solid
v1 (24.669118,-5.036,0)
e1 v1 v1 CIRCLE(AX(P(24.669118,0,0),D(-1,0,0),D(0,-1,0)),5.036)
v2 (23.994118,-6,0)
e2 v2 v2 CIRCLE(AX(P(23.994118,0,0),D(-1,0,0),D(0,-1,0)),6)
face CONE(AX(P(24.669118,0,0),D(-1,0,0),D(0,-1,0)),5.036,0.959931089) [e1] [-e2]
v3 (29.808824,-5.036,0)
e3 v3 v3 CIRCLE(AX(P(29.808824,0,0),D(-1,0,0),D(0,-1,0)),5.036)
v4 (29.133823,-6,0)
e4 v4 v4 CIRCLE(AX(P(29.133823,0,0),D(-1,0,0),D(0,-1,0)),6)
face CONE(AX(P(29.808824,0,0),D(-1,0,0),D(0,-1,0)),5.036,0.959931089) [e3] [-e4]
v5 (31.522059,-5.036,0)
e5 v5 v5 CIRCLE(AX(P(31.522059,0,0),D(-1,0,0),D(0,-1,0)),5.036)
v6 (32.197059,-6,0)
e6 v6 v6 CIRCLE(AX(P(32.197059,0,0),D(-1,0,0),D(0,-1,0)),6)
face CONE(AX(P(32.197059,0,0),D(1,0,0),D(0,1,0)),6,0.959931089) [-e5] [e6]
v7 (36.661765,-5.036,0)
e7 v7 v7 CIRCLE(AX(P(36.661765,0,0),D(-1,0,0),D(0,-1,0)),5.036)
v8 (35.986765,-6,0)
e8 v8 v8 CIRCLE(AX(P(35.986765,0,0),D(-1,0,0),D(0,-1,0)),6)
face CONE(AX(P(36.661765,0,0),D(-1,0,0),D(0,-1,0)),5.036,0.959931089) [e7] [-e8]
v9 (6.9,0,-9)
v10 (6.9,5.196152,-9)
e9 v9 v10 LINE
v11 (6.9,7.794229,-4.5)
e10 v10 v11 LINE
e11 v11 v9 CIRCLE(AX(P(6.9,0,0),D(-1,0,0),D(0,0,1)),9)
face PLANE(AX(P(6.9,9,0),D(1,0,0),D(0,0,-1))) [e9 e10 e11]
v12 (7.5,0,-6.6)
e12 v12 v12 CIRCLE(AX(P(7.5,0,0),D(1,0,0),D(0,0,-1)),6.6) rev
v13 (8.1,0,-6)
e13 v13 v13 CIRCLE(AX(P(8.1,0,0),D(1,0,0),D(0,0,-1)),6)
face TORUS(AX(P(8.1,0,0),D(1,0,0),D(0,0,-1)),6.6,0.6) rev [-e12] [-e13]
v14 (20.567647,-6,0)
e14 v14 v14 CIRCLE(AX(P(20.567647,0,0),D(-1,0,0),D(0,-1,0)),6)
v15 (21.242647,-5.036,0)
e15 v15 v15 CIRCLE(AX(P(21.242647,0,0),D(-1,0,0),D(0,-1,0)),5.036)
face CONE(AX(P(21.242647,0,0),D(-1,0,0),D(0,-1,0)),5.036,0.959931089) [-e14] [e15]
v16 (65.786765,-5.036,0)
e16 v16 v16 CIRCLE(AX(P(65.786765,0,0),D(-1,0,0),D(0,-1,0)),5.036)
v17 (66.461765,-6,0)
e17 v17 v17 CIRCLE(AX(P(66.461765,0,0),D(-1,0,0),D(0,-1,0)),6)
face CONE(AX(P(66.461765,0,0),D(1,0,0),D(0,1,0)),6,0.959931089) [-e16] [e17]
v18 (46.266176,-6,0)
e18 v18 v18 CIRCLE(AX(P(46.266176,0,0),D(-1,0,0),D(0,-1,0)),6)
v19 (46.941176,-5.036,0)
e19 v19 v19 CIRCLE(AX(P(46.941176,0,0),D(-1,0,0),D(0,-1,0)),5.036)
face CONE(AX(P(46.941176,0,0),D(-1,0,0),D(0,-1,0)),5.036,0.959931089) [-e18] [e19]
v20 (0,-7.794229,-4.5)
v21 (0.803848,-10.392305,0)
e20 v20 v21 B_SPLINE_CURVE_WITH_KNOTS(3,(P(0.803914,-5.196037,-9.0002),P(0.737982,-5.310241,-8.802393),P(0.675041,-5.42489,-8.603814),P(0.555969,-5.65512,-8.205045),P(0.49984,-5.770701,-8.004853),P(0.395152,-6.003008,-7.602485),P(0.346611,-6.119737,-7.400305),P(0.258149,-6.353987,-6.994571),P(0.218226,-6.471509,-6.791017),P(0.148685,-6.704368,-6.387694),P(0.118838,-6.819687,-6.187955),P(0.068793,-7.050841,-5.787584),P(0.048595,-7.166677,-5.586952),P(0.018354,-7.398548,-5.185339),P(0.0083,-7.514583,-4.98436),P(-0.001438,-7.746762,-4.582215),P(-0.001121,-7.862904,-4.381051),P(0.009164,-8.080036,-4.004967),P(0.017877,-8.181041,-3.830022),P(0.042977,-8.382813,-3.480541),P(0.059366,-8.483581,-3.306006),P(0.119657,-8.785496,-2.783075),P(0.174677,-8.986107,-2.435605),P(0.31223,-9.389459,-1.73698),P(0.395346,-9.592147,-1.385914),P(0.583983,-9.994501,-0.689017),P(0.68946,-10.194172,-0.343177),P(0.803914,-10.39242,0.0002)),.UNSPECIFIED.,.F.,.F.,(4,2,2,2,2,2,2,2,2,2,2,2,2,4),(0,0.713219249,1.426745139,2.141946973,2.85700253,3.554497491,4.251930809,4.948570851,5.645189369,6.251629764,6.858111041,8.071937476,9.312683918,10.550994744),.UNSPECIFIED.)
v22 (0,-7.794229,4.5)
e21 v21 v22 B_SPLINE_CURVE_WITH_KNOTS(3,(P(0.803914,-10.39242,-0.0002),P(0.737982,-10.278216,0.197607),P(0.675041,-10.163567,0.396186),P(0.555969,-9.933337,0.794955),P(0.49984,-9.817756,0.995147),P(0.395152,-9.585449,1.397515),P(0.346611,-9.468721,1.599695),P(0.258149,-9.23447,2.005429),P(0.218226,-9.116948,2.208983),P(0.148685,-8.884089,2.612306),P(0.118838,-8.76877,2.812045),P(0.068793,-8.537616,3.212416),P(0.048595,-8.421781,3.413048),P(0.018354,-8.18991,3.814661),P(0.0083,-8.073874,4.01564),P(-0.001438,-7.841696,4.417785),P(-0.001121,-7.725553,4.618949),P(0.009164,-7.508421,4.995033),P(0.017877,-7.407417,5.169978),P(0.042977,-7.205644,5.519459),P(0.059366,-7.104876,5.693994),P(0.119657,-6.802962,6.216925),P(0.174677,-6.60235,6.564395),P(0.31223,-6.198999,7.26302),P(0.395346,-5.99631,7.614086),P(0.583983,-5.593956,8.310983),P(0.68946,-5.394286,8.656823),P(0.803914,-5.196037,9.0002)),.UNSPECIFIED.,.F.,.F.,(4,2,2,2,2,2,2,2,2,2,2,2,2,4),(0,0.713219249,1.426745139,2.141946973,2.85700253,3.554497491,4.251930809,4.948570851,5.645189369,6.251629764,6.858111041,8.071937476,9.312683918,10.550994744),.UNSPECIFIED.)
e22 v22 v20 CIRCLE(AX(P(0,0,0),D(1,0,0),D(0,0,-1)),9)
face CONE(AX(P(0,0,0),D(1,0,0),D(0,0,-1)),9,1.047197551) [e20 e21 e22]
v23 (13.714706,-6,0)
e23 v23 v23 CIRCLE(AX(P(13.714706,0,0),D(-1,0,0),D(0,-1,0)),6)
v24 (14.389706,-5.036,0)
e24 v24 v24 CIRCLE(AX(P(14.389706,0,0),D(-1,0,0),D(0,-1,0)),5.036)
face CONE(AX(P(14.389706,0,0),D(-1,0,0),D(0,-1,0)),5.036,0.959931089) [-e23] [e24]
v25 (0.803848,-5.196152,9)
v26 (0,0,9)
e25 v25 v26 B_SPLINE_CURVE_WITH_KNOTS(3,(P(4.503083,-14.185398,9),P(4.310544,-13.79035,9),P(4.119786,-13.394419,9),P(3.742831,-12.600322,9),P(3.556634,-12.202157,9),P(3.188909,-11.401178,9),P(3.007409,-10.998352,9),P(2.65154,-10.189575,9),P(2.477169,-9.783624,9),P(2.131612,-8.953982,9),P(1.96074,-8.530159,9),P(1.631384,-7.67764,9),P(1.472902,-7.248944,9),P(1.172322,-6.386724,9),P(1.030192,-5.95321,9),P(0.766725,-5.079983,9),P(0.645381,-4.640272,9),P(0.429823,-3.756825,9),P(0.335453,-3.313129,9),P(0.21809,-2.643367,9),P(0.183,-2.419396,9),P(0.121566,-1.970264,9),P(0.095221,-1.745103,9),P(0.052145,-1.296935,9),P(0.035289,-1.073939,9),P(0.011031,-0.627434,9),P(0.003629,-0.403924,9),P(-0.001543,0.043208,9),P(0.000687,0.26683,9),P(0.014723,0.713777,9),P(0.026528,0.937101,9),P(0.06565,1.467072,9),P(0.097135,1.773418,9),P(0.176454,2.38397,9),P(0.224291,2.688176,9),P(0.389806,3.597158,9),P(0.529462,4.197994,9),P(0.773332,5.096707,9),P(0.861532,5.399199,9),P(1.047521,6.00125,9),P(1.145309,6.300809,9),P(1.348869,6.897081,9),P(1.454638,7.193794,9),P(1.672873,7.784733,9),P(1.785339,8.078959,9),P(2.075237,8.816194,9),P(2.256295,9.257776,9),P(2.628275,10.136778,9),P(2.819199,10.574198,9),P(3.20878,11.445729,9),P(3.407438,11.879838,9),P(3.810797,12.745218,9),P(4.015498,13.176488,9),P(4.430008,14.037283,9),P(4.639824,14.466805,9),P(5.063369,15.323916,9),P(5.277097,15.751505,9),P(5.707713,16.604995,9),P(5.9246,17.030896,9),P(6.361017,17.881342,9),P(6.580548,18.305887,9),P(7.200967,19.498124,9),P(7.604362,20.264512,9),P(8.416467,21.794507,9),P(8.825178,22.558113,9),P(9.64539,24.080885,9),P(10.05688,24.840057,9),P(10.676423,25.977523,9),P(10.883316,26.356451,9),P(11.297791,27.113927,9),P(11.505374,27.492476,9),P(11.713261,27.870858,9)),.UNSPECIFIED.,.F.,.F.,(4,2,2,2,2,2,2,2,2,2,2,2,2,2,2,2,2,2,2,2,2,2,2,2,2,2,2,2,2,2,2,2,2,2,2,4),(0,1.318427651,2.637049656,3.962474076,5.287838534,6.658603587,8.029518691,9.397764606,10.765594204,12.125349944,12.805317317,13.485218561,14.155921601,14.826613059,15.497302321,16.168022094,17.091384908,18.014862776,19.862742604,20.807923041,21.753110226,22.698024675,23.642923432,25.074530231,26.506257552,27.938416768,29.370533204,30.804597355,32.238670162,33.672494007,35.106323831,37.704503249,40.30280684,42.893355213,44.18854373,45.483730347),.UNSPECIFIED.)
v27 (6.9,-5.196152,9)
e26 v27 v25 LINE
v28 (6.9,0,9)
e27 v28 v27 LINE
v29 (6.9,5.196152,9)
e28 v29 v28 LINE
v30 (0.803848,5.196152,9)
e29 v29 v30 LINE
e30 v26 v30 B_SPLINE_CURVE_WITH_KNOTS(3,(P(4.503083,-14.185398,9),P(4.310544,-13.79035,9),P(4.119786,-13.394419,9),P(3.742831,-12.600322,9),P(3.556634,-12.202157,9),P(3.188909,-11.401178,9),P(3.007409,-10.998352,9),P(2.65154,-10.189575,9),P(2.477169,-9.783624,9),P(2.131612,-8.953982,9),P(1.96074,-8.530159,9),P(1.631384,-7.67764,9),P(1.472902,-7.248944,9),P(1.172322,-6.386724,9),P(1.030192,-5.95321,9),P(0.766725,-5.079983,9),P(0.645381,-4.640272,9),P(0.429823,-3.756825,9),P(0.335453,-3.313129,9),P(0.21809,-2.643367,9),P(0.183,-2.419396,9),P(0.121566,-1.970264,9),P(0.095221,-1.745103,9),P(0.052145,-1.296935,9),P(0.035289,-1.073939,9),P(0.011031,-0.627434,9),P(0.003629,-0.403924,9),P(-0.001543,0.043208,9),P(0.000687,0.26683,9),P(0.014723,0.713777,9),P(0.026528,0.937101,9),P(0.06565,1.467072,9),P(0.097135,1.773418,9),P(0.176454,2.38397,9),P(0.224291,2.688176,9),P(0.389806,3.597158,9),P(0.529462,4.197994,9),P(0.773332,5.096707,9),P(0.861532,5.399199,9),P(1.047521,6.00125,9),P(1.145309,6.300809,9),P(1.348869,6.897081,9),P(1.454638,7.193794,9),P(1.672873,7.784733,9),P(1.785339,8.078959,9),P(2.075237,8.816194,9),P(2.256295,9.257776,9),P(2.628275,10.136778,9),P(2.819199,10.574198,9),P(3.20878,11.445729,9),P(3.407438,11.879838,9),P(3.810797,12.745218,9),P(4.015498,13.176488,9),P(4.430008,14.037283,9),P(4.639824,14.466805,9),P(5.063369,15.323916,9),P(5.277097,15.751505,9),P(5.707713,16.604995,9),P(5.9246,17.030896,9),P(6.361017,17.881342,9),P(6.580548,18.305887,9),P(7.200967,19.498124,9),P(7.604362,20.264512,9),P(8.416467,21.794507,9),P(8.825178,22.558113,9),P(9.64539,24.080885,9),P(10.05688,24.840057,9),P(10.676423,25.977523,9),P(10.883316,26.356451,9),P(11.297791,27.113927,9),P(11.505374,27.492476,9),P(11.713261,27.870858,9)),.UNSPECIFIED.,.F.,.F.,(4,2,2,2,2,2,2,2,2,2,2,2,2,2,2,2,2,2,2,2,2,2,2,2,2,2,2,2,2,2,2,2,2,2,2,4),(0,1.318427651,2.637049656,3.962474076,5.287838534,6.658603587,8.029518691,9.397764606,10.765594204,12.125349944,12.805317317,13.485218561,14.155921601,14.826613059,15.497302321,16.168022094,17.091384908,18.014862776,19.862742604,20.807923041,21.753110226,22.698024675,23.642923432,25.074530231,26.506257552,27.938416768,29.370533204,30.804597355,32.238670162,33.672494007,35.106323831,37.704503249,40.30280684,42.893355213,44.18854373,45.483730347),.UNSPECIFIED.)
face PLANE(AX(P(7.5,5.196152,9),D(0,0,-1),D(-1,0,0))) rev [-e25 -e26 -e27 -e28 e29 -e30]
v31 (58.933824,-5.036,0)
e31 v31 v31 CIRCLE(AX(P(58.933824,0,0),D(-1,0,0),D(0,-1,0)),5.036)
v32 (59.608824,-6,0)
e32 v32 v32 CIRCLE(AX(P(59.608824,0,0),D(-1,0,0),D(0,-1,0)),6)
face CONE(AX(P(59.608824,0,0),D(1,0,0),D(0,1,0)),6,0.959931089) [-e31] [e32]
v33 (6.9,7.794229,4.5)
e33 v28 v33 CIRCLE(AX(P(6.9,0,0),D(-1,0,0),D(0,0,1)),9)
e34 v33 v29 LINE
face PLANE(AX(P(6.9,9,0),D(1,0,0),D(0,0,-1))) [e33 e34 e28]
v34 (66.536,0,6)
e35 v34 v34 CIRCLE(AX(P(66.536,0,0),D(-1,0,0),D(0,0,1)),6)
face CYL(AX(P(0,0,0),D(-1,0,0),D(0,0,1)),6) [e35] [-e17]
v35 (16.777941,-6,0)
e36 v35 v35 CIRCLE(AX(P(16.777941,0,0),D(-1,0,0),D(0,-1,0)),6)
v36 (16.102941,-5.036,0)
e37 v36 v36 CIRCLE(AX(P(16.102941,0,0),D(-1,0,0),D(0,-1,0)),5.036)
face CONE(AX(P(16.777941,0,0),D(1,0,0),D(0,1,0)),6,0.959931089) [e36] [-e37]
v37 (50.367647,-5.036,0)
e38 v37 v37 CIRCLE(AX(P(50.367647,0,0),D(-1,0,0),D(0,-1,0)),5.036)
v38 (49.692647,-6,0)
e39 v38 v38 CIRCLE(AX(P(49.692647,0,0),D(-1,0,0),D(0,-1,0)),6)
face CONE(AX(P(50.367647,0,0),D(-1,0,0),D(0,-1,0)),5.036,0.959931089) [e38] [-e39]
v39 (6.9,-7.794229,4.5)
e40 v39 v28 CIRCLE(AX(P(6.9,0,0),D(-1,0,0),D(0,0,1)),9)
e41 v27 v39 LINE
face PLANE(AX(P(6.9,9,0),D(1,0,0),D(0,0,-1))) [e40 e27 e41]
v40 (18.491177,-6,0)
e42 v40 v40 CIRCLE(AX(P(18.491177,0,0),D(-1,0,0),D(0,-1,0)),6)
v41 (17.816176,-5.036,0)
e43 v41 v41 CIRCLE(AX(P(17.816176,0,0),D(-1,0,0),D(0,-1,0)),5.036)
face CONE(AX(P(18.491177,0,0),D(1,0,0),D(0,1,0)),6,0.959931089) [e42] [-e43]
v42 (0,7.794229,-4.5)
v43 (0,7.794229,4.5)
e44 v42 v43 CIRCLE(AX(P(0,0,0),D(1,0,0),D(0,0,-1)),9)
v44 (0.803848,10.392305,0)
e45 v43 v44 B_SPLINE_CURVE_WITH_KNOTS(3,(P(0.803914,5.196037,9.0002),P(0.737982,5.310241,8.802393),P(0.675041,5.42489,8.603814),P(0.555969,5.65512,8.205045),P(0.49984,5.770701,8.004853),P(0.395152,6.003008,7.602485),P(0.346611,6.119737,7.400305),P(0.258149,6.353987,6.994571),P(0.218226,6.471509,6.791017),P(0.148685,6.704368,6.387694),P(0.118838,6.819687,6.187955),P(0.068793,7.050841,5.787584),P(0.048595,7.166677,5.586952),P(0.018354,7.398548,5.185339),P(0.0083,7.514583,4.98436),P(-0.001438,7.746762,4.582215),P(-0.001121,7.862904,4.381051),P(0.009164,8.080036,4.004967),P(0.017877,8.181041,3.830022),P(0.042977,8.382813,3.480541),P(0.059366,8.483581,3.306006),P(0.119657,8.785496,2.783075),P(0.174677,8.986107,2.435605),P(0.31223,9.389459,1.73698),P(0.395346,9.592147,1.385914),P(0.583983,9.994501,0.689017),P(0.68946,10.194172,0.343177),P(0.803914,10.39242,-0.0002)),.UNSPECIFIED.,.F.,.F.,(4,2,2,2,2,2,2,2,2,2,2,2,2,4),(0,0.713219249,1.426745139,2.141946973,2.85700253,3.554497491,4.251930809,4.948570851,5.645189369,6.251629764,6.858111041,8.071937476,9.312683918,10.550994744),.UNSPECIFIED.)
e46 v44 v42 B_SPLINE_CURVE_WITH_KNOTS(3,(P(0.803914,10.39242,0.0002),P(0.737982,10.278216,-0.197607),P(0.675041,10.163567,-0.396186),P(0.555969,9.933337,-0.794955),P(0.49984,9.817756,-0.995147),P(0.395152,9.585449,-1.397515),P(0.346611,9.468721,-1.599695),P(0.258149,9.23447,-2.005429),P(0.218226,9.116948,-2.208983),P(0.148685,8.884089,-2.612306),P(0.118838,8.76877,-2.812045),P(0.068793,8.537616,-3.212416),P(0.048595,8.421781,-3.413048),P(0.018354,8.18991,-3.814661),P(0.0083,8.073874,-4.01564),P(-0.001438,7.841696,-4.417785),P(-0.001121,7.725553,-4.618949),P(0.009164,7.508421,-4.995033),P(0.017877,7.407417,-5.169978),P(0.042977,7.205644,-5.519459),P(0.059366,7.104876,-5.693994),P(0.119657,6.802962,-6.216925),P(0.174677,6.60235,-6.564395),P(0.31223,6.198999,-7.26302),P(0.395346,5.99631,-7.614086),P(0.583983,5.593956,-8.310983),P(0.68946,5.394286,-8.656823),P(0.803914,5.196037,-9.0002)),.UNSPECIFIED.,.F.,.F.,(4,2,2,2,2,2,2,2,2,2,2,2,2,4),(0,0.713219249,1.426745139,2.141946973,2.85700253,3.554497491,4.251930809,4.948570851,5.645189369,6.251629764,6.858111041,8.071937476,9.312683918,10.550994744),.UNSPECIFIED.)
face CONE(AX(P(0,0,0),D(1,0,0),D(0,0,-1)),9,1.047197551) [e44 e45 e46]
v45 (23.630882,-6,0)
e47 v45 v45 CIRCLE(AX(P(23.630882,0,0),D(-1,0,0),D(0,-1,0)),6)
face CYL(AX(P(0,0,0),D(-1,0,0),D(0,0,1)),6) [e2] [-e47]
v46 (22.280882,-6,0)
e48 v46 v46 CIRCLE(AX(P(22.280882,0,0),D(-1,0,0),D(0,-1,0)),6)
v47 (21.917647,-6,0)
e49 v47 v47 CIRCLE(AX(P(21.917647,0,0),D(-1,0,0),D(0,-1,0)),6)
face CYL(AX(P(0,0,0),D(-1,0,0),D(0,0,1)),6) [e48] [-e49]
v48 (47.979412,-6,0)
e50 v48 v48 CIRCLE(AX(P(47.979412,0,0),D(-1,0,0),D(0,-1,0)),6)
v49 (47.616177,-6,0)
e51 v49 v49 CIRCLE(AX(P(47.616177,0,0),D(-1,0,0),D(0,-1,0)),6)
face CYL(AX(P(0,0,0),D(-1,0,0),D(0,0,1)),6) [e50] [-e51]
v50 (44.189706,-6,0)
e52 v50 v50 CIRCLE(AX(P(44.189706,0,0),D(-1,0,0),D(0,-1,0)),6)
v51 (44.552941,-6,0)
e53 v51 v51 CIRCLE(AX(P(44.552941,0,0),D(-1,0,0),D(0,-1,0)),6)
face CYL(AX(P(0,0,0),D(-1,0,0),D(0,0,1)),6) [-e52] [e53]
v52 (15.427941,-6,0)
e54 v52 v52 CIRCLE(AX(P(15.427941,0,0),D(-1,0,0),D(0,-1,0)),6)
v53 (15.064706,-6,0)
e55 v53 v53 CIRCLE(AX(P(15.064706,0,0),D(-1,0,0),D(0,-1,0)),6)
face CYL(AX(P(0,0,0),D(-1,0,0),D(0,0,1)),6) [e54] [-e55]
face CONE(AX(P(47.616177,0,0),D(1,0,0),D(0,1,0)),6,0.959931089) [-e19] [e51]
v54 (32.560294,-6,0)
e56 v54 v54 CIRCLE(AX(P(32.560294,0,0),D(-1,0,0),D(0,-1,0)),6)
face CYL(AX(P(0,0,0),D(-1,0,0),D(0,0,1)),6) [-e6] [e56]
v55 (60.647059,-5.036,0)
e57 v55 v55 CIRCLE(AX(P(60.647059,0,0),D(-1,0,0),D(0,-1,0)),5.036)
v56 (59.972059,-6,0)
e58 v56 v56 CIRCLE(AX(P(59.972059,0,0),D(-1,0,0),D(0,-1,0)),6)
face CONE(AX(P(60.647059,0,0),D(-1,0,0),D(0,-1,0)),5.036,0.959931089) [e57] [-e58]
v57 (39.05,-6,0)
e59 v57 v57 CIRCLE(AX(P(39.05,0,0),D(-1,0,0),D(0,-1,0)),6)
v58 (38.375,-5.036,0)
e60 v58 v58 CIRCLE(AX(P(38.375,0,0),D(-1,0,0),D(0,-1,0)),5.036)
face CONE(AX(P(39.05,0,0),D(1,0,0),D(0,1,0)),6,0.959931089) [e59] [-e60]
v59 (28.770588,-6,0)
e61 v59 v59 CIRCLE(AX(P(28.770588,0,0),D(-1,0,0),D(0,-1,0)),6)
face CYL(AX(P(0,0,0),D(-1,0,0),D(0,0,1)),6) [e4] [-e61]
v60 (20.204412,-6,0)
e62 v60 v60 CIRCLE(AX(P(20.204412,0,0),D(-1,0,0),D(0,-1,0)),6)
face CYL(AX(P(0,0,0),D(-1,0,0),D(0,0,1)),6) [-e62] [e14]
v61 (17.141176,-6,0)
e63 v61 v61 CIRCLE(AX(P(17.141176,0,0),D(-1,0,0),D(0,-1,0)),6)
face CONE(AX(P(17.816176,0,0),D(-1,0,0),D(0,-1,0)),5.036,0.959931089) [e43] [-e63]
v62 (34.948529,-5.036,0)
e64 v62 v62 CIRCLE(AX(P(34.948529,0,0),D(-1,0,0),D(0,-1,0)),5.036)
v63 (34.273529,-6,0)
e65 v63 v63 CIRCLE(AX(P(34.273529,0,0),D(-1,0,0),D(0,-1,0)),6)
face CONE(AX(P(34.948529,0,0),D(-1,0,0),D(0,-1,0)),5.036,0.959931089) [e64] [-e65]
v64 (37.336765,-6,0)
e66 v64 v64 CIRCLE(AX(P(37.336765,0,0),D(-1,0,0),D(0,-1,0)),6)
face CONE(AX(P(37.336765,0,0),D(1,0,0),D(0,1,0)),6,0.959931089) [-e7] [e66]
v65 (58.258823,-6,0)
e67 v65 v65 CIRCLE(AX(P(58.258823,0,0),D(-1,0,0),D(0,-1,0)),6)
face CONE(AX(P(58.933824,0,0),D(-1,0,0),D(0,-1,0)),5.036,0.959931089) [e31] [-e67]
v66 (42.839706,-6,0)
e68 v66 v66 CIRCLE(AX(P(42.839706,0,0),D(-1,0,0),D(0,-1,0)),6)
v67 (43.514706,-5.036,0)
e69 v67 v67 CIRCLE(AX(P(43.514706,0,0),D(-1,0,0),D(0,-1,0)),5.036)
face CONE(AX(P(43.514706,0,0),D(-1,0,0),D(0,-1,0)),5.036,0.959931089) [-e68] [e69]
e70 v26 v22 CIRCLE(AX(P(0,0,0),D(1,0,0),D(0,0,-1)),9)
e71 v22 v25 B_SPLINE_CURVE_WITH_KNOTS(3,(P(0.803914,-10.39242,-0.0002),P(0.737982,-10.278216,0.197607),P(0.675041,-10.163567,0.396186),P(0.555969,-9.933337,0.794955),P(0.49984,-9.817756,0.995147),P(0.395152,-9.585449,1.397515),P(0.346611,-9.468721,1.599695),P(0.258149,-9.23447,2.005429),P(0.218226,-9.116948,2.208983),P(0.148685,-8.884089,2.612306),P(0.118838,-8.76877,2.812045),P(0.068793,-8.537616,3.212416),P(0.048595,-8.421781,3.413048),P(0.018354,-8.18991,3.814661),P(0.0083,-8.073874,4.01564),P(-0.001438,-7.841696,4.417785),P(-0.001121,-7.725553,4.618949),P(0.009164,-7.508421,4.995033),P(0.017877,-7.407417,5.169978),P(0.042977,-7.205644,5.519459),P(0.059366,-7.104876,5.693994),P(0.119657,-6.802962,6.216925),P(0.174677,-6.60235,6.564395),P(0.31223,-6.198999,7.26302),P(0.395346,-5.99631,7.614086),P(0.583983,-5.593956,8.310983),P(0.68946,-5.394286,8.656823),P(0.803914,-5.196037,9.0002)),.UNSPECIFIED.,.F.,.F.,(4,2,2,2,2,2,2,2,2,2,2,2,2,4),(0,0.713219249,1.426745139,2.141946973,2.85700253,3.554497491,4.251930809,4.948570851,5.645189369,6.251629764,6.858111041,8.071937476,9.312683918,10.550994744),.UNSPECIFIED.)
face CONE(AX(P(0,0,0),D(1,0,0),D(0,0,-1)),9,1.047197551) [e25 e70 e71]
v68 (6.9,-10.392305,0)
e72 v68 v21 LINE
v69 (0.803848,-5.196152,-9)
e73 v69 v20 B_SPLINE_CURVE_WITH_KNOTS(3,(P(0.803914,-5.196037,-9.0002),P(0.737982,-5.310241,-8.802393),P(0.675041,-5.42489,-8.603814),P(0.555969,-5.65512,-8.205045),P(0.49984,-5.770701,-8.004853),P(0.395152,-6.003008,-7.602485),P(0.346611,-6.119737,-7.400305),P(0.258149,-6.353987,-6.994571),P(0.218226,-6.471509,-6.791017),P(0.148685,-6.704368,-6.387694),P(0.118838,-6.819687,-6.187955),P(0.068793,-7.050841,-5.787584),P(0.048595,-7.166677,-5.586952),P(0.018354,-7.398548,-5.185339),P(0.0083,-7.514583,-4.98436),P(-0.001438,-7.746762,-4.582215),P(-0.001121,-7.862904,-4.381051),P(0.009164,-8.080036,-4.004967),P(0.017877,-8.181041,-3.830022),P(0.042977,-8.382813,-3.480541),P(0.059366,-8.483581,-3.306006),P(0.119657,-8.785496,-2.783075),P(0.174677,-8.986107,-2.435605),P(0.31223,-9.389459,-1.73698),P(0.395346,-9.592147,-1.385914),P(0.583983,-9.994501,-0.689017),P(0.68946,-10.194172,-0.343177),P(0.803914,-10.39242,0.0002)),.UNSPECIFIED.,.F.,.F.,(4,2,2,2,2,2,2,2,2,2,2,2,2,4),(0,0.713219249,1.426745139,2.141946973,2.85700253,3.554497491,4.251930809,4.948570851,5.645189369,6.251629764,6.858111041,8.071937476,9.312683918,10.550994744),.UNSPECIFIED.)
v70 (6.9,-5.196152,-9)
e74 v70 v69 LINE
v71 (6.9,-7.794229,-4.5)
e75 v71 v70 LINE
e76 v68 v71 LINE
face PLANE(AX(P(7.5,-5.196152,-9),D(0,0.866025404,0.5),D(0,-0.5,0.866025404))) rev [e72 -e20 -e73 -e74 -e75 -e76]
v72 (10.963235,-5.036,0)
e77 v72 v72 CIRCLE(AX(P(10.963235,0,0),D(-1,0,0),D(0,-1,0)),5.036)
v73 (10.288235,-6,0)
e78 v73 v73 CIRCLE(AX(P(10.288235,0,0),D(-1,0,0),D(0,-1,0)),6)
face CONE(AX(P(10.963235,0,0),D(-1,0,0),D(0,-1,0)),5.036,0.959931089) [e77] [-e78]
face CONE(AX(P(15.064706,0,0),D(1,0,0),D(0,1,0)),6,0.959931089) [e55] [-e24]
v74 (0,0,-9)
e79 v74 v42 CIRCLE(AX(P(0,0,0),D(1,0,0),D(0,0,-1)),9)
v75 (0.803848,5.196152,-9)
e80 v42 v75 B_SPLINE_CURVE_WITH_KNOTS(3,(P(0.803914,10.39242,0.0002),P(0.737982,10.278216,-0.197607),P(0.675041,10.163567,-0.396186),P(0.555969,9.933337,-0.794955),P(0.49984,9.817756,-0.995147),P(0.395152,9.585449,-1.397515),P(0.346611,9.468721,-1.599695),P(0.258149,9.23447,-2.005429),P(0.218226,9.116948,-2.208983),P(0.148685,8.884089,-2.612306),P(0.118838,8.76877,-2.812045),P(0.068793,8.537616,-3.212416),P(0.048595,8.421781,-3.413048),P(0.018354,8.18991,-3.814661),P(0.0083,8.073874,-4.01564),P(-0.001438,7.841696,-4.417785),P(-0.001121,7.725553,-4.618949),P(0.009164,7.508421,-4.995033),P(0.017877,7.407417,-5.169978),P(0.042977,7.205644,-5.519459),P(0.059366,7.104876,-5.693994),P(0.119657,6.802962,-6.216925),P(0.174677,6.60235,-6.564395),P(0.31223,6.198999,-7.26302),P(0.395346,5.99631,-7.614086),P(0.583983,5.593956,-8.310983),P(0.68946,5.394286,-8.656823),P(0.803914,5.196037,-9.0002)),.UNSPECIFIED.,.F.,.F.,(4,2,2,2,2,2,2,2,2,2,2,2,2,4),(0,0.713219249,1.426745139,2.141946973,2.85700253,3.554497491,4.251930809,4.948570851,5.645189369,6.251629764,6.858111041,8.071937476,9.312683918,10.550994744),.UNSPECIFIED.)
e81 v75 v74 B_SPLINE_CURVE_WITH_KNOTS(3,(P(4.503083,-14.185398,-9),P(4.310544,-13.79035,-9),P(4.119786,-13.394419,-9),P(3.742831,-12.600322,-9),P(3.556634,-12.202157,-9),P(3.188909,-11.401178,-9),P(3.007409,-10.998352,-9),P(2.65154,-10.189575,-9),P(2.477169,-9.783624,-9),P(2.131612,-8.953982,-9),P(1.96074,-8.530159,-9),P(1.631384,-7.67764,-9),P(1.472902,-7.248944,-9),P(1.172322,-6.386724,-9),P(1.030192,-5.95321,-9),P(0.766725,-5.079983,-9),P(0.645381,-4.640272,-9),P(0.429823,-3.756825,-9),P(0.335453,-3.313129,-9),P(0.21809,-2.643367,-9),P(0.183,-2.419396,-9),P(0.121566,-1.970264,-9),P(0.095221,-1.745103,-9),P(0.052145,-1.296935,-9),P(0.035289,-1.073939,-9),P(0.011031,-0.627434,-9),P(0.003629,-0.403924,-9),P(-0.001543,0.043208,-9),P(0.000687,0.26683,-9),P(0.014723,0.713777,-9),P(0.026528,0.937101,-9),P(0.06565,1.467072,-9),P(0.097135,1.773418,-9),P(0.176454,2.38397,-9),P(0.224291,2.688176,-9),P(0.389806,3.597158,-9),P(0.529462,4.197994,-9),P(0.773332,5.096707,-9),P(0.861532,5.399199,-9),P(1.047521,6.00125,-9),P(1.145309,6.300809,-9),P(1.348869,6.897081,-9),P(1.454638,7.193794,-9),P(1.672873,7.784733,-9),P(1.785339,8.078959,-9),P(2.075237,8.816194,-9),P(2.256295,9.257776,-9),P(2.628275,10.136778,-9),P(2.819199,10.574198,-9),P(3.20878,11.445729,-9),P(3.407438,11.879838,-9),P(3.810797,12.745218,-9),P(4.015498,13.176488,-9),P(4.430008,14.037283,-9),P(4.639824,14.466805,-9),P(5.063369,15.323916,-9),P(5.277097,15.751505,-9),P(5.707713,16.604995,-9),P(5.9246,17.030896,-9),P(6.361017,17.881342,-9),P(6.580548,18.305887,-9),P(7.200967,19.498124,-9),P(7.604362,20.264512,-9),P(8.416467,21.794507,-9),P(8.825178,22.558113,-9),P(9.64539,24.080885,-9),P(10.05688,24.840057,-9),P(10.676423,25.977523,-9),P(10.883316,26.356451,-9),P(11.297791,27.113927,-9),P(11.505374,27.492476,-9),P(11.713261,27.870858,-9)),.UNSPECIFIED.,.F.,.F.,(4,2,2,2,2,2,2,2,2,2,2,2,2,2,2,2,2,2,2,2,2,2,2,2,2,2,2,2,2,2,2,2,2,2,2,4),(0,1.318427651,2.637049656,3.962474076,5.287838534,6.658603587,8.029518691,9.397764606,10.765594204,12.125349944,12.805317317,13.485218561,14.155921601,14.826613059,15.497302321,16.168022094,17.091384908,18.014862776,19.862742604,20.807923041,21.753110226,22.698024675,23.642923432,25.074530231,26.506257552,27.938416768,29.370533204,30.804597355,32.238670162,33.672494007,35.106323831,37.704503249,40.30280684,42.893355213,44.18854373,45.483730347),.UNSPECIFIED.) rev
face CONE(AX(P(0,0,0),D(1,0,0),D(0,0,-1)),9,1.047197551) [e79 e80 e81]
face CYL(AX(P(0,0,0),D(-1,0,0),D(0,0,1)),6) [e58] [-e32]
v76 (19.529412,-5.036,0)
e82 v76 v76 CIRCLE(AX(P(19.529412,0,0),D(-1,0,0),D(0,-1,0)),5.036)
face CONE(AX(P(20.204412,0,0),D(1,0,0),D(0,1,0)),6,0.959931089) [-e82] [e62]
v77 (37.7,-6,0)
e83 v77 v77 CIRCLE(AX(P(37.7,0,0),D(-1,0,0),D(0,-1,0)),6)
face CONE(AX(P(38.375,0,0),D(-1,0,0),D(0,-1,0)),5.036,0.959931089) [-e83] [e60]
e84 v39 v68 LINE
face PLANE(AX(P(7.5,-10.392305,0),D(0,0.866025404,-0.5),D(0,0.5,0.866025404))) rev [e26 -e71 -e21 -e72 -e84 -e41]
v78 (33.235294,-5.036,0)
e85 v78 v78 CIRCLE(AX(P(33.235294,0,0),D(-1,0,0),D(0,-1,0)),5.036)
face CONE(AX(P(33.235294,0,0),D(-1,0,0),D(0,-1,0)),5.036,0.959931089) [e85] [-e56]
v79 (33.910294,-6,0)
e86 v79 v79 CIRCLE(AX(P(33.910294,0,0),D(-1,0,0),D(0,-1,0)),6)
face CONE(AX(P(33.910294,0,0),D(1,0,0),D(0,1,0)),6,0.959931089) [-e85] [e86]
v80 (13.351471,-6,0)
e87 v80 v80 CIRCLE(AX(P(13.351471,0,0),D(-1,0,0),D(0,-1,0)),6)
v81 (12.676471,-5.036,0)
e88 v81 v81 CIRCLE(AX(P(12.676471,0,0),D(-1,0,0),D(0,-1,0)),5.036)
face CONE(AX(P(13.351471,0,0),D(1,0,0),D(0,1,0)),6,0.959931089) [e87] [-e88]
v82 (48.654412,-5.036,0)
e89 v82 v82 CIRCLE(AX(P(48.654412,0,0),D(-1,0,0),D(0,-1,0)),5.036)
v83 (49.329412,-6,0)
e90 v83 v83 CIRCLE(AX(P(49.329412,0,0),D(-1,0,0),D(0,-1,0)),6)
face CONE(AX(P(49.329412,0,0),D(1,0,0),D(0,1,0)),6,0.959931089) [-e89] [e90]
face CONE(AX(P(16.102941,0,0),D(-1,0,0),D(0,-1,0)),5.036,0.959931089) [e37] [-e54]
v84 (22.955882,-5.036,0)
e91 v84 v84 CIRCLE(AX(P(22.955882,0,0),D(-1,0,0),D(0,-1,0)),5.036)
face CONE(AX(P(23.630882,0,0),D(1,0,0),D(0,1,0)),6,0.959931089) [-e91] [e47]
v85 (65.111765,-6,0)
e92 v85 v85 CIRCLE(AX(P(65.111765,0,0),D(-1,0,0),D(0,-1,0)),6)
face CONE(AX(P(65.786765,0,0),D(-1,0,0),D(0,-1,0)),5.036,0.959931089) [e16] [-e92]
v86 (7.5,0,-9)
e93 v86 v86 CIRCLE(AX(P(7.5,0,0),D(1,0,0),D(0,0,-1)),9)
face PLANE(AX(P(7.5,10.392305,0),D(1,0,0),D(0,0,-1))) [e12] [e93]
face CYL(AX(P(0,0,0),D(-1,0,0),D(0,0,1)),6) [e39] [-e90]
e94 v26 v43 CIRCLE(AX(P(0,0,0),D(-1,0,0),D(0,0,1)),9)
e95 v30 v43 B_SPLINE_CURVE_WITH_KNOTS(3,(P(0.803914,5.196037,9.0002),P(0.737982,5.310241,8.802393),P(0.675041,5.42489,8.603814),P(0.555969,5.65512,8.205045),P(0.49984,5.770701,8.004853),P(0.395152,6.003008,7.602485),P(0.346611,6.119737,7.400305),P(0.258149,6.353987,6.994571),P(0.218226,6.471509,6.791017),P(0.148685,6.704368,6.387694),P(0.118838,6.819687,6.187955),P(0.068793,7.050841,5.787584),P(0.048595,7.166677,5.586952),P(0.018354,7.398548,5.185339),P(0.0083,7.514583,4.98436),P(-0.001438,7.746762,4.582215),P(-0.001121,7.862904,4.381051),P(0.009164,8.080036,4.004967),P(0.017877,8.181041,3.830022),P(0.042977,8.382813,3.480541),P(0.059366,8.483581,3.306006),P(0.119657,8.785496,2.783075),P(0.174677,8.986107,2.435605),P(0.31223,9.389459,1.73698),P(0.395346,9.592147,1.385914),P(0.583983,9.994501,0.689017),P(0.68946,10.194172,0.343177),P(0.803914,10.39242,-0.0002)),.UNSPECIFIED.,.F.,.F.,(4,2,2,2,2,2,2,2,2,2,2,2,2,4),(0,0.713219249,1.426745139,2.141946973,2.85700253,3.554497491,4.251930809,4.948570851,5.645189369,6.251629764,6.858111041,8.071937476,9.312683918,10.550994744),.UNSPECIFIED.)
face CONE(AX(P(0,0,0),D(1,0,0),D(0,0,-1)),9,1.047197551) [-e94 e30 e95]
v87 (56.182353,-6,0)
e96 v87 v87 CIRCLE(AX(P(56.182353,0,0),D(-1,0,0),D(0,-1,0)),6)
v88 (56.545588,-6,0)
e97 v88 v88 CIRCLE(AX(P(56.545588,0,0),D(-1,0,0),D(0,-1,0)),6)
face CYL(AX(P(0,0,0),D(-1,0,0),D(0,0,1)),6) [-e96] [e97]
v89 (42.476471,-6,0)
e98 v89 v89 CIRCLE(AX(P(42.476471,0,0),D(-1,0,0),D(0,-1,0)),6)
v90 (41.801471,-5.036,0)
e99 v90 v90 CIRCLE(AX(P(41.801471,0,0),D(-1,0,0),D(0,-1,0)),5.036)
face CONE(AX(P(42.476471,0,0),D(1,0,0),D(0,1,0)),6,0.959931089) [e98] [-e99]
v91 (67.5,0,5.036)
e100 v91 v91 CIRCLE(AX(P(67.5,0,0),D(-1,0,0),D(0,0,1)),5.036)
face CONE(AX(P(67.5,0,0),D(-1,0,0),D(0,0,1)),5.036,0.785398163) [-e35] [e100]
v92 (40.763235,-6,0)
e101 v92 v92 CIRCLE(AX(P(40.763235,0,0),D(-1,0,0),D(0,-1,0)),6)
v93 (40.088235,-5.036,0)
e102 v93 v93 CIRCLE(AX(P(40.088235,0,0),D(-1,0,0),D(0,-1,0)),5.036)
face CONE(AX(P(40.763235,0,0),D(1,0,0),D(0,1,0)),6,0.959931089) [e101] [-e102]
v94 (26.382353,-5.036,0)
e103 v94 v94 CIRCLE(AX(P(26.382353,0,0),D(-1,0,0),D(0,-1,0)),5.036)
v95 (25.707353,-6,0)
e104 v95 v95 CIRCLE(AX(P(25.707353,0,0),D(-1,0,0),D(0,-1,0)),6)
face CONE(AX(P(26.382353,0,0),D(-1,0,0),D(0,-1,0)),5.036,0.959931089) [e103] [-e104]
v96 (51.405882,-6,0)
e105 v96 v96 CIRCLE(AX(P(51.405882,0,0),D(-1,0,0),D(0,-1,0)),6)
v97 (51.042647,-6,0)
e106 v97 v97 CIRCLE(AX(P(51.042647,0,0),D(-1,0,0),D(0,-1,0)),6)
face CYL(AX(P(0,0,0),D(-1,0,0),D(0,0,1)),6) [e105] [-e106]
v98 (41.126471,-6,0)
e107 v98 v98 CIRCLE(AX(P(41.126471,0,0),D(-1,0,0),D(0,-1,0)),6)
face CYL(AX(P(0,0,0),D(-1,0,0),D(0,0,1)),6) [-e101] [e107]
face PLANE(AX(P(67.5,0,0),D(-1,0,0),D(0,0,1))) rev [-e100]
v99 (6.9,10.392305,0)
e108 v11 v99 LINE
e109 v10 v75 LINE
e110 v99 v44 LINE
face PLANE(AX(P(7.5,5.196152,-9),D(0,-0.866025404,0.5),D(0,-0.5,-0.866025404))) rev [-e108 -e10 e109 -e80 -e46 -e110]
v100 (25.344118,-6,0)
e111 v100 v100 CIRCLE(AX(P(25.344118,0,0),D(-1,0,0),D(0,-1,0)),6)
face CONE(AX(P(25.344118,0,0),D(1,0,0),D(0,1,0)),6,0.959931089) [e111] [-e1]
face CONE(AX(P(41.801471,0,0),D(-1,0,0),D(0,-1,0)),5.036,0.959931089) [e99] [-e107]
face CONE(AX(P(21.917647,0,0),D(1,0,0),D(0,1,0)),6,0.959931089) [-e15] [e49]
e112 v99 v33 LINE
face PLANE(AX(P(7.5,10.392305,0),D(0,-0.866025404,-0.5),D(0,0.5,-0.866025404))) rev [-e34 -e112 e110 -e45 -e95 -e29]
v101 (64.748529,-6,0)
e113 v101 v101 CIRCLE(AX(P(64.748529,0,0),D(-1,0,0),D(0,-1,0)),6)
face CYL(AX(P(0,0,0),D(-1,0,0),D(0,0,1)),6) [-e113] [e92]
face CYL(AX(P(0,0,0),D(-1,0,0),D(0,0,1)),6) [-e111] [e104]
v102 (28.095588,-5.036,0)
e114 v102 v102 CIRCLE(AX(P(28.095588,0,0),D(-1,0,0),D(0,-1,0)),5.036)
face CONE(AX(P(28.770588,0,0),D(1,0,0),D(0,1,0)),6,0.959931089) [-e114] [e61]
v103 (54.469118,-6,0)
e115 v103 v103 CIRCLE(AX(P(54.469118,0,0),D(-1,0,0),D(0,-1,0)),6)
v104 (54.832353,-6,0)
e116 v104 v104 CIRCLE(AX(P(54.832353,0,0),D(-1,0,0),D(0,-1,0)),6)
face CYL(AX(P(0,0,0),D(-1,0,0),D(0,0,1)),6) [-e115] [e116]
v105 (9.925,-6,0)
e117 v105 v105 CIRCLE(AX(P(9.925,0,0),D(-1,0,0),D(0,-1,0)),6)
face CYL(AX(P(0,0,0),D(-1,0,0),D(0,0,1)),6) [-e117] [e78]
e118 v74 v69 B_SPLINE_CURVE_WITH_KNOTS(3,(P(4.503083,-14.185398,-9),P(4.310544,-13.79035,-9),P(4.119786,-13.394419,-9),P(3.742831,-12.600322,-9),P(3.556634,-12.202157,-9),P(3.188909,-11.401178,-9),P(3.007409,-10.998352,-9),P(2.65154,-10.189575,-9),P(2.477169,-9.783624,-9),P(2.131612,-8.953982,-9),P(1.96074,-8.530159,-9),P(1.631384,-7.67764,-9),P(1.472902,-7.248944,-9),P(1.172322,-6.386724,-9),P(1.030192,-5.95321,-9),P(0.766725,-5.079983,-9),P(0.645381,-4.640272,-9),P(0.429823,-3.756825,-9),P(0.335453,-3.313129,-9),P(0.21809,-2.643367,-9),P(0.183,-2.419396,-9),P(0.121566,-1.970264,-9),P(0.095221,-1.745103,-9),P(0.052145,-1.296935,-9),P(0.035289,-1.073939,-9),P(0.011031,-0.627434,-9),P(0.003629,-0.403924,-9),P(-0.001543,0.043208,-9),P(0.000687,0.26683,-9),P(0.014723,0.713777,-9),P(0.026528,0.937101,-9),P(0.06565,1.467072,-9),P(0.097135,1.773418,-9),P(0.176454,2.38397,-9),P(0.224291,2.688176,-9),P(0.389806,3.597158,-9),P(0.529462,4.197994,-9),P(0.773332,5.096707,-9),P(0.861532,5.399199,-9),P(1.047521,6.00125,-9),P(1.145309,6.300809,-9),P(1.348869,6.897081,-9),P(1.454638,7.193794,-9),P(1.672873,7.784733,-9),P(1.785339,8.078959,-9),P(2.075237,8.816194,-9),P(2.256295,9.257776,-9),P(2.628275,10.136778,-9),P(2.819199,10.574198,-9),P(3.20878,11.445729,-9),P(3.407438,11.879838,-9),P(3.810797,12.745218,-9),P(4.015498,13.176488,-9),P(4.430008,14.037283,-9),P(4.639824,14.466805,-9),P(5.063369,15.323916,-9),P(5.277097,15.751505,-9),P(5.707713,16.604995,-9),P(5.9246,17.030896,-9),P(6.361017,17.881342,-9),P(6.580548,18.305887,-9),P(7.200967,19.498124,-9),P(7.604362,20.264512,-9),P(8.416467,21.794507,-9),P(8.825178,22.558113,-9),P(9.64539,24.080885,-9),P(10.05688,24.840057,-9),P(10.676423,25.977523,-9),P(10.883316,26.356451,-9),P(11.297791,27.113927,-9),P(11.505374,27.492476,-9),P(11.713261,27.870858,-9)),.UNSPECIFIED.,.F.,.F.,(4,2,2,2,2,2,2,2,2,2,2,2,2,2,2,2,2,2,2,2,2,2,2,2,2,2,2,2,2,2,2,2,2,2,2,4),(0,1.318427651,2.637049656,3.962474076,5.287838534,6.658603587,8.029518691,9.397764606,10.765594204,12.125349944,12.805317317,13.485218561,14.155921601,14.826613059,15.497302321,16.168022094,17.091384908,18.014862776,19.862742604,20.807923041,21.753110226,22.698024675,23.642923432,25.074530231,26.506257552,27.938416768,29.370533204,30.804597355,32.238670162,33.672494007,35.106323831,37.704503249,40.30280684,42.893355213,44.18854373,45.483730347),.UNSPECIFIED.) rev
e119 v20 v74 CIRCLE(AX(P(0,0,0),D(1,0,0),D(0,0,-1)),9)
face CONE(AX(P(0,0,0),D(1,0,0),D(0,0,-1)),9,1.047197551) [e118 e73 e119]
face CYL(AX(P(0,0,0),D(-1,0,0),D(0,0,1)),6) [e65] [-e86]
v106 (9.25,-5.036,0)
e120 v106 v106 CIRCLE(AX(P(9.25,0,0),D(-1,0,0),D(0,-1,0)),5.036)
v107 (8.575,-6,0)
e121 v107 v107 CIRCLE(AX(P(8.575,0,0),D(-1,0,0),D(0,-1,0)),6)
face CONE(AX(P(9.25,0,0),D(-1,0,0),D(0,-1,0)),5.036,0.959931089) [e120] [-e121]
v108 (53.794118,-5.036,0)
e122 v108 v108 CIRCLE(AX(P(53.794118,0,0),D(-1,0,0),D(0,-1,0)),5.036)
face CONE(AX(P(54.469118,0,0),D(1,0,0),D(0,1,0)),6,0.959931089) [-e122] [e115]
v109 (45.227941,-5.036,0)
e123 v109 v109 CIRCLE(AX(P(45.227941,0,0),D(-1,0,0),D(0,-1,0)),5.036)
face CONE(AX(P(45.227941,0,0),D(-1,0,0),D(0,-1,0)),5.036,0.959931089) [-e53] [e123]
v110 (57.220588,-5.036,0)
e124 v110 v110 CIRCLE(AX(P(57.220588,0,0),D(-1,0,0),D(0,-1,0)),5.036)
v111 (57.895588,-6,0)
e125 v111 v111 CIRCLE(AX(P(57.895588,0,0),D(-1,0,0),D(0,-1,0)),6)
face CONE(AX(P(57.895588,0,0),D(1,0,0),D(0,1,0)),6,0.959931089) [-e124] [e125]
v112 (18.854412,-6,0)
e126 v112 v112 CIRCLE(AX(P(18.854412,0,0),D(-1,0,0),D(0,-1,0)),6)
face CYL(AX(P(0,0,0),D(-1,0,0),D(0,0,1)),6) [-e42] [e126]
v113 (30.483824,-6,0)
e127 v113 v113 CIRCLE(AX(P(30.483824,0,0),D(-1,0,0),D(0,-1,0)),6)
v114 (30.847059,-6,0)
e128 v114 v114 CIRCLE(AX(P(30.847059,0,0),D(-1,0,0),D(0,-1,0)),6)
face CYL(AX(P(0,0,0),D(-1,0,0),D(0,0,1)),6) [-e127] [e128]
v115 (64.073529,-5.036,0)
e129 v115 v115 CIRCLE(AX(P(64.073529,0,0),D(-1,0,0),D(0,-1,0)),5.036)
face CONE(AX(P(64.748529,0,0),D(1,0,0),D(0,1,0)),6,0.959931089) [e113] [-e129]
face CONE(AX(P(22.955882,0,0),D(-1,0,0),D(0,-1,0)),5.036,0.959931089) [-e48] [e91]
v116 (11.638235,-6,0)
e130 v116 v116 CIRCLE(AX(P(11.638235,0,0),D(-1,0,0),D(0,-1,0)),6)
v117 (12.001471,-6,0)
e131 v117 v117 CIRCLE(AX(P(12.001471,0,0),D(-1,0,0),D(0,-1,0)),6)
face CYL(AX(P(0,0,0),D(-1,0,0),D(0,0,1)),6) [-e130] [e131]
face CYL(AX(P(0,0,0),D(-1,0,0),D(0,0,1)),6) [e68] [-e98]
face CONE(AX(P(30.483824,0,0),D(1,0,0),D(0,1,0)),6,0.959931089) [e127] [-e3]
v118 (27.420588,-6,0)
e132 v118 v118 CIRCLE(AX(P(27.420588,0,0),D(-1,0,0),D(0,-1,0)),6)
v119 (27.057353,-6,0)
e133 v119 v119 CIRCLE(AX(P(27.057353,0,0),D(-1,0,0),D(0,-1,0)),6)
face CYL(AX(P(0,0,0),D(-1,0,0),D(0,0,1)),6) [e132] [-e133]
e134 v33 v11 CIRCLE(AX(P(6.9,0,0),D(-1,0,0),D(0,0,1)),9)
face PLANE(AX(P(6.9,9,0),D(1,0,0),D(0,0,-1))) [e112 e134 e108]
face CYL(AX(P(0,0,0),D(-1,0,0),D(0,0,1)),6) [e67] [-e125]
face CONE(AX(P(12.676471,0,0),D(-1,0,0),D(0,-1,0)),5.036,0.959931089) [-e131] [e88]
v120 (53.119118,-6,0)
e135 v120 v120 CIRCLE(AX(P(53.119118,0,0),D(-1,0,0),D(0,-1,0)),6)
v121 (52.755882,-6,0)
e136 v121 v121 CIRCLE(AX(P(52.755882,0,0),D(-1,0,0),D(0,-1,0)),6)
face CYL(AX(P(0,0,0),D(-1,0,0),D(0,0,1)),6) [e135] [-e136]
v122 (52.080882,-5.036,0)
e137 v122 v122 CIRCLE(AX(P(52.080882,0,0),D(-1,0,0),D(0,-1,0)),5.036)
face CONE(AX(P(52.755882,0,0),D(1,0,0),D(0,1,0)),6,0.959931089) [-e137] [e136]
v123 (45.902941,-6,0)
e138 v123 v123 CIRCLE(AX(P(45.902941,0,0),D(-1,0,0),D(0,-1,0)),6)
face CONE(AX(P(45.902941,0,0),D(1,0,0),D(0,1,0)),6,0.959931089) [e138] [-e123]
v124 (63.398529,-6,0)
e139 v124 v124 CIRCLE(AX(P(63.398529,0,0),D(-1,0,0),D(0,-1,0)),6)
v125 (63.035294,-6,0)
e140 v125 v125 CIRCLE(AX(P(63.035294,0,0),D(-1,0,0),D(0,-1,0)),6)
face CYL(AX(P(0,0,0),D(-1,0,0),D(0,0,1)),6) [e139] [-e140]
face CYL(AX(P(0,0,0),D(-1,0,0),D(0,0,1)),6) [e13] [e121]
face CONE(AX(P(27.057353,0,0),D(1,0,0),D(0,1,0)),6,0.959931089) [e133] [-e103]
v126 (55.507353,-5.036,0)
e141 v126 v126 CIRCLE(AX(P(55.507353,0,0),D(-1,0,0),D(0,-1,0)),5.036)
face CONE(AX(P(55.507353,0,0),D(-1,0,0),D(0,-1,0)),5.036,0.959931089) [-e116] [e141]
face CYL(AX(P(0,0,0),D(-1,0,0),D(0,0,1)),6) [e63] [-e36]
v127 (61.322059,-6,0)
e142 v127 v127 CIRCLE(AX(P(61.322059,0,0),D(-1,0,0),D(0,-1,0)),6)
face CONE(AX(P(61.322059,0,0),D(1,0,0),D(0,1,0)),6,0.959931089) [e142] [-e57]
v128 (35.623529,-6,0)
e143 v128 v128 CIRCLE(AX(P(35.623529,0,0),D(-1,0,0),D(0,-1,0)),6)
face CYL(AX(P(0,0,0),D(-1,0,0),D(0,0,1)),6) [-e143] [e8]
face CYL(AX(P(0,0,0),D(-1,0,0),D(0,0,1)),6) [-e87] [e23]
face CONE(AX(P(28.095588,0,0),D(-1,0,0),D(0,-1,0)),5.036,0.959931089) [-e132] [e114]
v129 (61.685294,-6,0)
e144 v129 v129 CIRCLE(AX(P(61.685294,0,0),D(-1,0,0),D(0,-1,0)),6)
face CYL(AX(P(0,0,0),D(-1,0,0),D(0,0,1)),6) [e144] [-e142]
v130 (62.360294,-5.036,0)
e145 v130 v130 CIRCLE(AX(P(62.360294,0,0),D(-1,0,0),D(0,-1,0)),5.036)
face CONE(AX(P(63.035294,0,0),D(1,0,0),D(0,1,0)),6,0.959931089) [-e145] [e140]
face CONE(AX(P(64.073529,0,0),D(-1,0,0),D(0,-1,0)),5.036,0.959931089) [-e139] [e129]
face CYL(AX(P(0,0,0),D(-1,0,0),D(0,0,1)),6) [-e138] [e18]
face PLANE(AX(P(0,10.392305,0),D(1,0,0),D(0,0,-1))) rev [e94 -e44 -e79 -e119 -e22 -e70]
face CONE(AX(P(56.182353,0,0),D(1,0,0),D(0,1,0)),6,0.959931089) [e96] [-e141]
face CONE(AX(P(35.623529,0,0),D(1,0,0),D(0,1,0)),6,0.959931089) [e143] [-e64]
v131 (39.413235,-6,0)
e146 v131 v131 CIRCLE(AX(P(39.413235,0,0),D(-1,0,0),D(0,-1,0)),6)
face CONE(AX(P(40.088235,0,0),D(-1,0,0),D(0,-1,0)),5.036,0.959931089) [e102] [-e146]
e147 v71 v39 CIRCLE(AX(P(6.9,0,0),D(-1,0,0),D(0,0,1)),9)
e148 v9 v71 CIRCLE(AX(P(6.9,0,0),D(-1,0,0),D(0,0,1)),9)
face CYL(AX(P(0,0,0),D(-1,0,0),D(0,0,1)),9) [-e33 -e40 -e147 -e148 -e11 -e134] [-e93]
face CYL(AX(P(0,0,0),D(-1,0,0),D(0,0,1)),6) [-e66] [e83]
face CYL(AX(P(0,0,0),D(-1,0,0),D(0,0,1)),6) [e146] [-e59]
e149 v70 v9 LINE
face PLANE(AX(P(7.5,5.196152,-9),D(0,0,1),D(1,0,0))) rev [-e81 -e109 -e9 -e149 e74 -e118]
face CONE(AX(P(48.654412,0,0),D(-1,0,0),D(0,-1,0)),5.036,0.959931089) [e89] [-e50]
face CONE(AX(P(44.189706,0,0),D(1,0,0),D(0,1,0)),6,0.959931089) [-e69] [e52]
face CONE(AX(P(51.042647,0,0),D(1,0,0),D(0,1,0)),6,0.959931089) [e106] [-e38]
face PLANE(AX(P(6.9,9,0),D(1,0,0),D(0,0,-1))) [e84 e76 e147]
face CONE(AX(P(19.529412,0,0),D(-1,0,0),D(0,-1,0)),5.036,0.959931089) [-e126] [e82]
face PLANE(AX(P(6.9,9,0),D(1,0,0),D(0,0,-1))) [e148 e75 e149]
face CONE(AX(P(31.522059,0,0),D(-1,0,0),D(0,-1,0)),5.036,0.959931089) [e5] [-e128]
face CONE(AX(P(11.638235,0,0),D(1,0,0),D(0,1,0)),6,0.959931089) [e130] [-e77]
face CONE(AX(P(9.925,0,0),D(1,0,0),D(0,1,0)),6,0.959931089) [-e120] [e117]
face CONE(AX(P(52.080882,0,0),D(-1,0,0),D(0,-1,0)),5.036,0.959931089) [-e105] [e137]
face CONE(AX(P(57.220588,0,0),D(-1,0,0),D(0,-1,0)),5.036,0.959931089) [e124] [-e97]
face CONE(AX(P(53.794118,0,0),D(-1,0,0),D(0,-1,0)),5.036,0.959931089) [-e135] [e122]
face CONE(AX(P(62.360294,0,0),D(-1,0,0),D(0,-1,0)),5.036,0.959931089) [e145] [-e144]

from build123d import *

# Parameters (mm, degrees)
BASEHEAD_DEPTH  = 7.5
BASEBODY_START  = 6.9
BASEBODY_DEPTH  = 0.6
HEADFILLET_R    = 0.6
THDSCHPAT_COUNT = 34
THDSCHPAT_PITCH = 1.713235294


# Read off the part's stored shape, not the designer's step: BearingFace, BaseBody
with BuildPart() as part:
    # Sketch1 → BaseHead (new body)
    with BuildSketch(Plane(origin=(0, 0, 0), x_dir=(0, 0, -1), z_dir=(1, 0, 0))):
        Polygon((9, 5.196152423), (9, -5.196152423), (0, -10.392304845), (-9, -5.196152423), (-9, 5.196152423), (0, 10.392304845), align=None)
    extrude(amount=BASEHEAD_DEPTH)

    # BearingFace outline → BearingFace (revolve)
    with BuildSketch(Plane.YX):
        Polygon((6, 7.5), (6, 66.536), (5.036, 67.5), (0, 67.5), (0, 7.5), align=None)
    revolve(axis=Axis((0, 0, 0), (1, 0, 0)))

    # Sketch3 → HeadChamfer (revolve, cut)
    with BuildSketch(Plane.XY, mode=Mode.PRIVATE) as headchamfer_sk:
        Polygon((0, 9), (3.690598923, 15.392304845), (3.690598923, 20.392304845), (-10, 20.392304845), (-10, 9), align=None)
    revolve(headchamfer_sk.sketch.rotate(Axis((0, 0, 0), (1, 0, 0)), 90), axis=Axis((0, 0, 0), (1, 0, 0)), mode=Mode.SUBTRACT)

    # BaseBody outline → BaseBody (cut)
    with BuildSketch(Plane.YZ.offset(BASEBODY_START)):
        with BuildLine():
            ThreePointArc((7.794228634, 4.5), (9, 0), (7.794228634, -4.499999999))
            Line((7.794228634, -4.499999999), (10.392304845, 0))
            Line((10.392304845, 0), (7.794228634, 4.5))
        make_face()
        with BuildLine():
            ThreePointArc((0, 9), (4.5, 7.794228634), (7.794228634, 4.5))
            Line((7.794228634, 4.5), (5.196152423, 9))
            Line((5.196152423, 9), (0, 9))
        make_face()
        with BuildLine():
            Line((5.196152423, -9), (7.794228634, -4.499999999))
            ThreePointArc((7.794228634, -4.499999999), (4.5, -7.794228634), (0, -9))
            Line((0, -9), (5.196152423, -9))
        make_face()
        with BuildLine():
            ThreePointArc((-7.794228634, 4.5), (-4.5, 7.794228634), (0, 9))
            Line((0, 9), (-5.196152423, 9))
            Line((-5.196152423, 9), (-7.794228634, 4.5))
        make_face()
        with BuildLine():
            Line((-5.196152423, -9), (0, -9))
            ThreePointArc((0, -9), (-4.5, -7.794228634), (-7.794228634, -4.5))
            Line((-7.794228634, -4.5), (-5.196152423, -9))
        make_face()
        with BuildLine():
            ThreePointArc((-7.794228634, -4.5), (-9, 0), (-7.794228634, 4.5))
            Line((-7.794228634, 4.5), (-10.392304845, 0))
            Line((-10.392304845, 0), (-7.794228634, -4.5))
        make_face()
    extrude(amount=BASEBODY_DEPTH, mode=Mode.SUBTRACT)

    # HeadFillet
    headfillet_edges = [part.edges().sort_by_distance(p)[0] for p in [
        (7.5, -6, 0),
    ]]
    fillet(headfillet_edges, radius=HEADFILLET_R)

    # ThdSchSke → ThreadSchematic (revolve, cut)
    with BuildSketch(Plane.XY):
        Polygon((9.25, -5.036), (8.574999933, -6), (8.574999933, -7.5), (9.925000067, -7.5), (9.925000067, -6), align=None)
    threadschematic = revolve(axis=Axis((-3.175, 0, 0), (1, 0, 0)), mode=Mode.SUBTRACT)

    # ThdSchPat: ThreadSchematic ×34
    with Locations(*[(i * THDSCHPAT_PITCH, 0, 0) for i in range(1, THDSCHPAT_COUNT)]):
        add(threadschematic, mode=Mode.SUBTRACT)


solid = part.part
